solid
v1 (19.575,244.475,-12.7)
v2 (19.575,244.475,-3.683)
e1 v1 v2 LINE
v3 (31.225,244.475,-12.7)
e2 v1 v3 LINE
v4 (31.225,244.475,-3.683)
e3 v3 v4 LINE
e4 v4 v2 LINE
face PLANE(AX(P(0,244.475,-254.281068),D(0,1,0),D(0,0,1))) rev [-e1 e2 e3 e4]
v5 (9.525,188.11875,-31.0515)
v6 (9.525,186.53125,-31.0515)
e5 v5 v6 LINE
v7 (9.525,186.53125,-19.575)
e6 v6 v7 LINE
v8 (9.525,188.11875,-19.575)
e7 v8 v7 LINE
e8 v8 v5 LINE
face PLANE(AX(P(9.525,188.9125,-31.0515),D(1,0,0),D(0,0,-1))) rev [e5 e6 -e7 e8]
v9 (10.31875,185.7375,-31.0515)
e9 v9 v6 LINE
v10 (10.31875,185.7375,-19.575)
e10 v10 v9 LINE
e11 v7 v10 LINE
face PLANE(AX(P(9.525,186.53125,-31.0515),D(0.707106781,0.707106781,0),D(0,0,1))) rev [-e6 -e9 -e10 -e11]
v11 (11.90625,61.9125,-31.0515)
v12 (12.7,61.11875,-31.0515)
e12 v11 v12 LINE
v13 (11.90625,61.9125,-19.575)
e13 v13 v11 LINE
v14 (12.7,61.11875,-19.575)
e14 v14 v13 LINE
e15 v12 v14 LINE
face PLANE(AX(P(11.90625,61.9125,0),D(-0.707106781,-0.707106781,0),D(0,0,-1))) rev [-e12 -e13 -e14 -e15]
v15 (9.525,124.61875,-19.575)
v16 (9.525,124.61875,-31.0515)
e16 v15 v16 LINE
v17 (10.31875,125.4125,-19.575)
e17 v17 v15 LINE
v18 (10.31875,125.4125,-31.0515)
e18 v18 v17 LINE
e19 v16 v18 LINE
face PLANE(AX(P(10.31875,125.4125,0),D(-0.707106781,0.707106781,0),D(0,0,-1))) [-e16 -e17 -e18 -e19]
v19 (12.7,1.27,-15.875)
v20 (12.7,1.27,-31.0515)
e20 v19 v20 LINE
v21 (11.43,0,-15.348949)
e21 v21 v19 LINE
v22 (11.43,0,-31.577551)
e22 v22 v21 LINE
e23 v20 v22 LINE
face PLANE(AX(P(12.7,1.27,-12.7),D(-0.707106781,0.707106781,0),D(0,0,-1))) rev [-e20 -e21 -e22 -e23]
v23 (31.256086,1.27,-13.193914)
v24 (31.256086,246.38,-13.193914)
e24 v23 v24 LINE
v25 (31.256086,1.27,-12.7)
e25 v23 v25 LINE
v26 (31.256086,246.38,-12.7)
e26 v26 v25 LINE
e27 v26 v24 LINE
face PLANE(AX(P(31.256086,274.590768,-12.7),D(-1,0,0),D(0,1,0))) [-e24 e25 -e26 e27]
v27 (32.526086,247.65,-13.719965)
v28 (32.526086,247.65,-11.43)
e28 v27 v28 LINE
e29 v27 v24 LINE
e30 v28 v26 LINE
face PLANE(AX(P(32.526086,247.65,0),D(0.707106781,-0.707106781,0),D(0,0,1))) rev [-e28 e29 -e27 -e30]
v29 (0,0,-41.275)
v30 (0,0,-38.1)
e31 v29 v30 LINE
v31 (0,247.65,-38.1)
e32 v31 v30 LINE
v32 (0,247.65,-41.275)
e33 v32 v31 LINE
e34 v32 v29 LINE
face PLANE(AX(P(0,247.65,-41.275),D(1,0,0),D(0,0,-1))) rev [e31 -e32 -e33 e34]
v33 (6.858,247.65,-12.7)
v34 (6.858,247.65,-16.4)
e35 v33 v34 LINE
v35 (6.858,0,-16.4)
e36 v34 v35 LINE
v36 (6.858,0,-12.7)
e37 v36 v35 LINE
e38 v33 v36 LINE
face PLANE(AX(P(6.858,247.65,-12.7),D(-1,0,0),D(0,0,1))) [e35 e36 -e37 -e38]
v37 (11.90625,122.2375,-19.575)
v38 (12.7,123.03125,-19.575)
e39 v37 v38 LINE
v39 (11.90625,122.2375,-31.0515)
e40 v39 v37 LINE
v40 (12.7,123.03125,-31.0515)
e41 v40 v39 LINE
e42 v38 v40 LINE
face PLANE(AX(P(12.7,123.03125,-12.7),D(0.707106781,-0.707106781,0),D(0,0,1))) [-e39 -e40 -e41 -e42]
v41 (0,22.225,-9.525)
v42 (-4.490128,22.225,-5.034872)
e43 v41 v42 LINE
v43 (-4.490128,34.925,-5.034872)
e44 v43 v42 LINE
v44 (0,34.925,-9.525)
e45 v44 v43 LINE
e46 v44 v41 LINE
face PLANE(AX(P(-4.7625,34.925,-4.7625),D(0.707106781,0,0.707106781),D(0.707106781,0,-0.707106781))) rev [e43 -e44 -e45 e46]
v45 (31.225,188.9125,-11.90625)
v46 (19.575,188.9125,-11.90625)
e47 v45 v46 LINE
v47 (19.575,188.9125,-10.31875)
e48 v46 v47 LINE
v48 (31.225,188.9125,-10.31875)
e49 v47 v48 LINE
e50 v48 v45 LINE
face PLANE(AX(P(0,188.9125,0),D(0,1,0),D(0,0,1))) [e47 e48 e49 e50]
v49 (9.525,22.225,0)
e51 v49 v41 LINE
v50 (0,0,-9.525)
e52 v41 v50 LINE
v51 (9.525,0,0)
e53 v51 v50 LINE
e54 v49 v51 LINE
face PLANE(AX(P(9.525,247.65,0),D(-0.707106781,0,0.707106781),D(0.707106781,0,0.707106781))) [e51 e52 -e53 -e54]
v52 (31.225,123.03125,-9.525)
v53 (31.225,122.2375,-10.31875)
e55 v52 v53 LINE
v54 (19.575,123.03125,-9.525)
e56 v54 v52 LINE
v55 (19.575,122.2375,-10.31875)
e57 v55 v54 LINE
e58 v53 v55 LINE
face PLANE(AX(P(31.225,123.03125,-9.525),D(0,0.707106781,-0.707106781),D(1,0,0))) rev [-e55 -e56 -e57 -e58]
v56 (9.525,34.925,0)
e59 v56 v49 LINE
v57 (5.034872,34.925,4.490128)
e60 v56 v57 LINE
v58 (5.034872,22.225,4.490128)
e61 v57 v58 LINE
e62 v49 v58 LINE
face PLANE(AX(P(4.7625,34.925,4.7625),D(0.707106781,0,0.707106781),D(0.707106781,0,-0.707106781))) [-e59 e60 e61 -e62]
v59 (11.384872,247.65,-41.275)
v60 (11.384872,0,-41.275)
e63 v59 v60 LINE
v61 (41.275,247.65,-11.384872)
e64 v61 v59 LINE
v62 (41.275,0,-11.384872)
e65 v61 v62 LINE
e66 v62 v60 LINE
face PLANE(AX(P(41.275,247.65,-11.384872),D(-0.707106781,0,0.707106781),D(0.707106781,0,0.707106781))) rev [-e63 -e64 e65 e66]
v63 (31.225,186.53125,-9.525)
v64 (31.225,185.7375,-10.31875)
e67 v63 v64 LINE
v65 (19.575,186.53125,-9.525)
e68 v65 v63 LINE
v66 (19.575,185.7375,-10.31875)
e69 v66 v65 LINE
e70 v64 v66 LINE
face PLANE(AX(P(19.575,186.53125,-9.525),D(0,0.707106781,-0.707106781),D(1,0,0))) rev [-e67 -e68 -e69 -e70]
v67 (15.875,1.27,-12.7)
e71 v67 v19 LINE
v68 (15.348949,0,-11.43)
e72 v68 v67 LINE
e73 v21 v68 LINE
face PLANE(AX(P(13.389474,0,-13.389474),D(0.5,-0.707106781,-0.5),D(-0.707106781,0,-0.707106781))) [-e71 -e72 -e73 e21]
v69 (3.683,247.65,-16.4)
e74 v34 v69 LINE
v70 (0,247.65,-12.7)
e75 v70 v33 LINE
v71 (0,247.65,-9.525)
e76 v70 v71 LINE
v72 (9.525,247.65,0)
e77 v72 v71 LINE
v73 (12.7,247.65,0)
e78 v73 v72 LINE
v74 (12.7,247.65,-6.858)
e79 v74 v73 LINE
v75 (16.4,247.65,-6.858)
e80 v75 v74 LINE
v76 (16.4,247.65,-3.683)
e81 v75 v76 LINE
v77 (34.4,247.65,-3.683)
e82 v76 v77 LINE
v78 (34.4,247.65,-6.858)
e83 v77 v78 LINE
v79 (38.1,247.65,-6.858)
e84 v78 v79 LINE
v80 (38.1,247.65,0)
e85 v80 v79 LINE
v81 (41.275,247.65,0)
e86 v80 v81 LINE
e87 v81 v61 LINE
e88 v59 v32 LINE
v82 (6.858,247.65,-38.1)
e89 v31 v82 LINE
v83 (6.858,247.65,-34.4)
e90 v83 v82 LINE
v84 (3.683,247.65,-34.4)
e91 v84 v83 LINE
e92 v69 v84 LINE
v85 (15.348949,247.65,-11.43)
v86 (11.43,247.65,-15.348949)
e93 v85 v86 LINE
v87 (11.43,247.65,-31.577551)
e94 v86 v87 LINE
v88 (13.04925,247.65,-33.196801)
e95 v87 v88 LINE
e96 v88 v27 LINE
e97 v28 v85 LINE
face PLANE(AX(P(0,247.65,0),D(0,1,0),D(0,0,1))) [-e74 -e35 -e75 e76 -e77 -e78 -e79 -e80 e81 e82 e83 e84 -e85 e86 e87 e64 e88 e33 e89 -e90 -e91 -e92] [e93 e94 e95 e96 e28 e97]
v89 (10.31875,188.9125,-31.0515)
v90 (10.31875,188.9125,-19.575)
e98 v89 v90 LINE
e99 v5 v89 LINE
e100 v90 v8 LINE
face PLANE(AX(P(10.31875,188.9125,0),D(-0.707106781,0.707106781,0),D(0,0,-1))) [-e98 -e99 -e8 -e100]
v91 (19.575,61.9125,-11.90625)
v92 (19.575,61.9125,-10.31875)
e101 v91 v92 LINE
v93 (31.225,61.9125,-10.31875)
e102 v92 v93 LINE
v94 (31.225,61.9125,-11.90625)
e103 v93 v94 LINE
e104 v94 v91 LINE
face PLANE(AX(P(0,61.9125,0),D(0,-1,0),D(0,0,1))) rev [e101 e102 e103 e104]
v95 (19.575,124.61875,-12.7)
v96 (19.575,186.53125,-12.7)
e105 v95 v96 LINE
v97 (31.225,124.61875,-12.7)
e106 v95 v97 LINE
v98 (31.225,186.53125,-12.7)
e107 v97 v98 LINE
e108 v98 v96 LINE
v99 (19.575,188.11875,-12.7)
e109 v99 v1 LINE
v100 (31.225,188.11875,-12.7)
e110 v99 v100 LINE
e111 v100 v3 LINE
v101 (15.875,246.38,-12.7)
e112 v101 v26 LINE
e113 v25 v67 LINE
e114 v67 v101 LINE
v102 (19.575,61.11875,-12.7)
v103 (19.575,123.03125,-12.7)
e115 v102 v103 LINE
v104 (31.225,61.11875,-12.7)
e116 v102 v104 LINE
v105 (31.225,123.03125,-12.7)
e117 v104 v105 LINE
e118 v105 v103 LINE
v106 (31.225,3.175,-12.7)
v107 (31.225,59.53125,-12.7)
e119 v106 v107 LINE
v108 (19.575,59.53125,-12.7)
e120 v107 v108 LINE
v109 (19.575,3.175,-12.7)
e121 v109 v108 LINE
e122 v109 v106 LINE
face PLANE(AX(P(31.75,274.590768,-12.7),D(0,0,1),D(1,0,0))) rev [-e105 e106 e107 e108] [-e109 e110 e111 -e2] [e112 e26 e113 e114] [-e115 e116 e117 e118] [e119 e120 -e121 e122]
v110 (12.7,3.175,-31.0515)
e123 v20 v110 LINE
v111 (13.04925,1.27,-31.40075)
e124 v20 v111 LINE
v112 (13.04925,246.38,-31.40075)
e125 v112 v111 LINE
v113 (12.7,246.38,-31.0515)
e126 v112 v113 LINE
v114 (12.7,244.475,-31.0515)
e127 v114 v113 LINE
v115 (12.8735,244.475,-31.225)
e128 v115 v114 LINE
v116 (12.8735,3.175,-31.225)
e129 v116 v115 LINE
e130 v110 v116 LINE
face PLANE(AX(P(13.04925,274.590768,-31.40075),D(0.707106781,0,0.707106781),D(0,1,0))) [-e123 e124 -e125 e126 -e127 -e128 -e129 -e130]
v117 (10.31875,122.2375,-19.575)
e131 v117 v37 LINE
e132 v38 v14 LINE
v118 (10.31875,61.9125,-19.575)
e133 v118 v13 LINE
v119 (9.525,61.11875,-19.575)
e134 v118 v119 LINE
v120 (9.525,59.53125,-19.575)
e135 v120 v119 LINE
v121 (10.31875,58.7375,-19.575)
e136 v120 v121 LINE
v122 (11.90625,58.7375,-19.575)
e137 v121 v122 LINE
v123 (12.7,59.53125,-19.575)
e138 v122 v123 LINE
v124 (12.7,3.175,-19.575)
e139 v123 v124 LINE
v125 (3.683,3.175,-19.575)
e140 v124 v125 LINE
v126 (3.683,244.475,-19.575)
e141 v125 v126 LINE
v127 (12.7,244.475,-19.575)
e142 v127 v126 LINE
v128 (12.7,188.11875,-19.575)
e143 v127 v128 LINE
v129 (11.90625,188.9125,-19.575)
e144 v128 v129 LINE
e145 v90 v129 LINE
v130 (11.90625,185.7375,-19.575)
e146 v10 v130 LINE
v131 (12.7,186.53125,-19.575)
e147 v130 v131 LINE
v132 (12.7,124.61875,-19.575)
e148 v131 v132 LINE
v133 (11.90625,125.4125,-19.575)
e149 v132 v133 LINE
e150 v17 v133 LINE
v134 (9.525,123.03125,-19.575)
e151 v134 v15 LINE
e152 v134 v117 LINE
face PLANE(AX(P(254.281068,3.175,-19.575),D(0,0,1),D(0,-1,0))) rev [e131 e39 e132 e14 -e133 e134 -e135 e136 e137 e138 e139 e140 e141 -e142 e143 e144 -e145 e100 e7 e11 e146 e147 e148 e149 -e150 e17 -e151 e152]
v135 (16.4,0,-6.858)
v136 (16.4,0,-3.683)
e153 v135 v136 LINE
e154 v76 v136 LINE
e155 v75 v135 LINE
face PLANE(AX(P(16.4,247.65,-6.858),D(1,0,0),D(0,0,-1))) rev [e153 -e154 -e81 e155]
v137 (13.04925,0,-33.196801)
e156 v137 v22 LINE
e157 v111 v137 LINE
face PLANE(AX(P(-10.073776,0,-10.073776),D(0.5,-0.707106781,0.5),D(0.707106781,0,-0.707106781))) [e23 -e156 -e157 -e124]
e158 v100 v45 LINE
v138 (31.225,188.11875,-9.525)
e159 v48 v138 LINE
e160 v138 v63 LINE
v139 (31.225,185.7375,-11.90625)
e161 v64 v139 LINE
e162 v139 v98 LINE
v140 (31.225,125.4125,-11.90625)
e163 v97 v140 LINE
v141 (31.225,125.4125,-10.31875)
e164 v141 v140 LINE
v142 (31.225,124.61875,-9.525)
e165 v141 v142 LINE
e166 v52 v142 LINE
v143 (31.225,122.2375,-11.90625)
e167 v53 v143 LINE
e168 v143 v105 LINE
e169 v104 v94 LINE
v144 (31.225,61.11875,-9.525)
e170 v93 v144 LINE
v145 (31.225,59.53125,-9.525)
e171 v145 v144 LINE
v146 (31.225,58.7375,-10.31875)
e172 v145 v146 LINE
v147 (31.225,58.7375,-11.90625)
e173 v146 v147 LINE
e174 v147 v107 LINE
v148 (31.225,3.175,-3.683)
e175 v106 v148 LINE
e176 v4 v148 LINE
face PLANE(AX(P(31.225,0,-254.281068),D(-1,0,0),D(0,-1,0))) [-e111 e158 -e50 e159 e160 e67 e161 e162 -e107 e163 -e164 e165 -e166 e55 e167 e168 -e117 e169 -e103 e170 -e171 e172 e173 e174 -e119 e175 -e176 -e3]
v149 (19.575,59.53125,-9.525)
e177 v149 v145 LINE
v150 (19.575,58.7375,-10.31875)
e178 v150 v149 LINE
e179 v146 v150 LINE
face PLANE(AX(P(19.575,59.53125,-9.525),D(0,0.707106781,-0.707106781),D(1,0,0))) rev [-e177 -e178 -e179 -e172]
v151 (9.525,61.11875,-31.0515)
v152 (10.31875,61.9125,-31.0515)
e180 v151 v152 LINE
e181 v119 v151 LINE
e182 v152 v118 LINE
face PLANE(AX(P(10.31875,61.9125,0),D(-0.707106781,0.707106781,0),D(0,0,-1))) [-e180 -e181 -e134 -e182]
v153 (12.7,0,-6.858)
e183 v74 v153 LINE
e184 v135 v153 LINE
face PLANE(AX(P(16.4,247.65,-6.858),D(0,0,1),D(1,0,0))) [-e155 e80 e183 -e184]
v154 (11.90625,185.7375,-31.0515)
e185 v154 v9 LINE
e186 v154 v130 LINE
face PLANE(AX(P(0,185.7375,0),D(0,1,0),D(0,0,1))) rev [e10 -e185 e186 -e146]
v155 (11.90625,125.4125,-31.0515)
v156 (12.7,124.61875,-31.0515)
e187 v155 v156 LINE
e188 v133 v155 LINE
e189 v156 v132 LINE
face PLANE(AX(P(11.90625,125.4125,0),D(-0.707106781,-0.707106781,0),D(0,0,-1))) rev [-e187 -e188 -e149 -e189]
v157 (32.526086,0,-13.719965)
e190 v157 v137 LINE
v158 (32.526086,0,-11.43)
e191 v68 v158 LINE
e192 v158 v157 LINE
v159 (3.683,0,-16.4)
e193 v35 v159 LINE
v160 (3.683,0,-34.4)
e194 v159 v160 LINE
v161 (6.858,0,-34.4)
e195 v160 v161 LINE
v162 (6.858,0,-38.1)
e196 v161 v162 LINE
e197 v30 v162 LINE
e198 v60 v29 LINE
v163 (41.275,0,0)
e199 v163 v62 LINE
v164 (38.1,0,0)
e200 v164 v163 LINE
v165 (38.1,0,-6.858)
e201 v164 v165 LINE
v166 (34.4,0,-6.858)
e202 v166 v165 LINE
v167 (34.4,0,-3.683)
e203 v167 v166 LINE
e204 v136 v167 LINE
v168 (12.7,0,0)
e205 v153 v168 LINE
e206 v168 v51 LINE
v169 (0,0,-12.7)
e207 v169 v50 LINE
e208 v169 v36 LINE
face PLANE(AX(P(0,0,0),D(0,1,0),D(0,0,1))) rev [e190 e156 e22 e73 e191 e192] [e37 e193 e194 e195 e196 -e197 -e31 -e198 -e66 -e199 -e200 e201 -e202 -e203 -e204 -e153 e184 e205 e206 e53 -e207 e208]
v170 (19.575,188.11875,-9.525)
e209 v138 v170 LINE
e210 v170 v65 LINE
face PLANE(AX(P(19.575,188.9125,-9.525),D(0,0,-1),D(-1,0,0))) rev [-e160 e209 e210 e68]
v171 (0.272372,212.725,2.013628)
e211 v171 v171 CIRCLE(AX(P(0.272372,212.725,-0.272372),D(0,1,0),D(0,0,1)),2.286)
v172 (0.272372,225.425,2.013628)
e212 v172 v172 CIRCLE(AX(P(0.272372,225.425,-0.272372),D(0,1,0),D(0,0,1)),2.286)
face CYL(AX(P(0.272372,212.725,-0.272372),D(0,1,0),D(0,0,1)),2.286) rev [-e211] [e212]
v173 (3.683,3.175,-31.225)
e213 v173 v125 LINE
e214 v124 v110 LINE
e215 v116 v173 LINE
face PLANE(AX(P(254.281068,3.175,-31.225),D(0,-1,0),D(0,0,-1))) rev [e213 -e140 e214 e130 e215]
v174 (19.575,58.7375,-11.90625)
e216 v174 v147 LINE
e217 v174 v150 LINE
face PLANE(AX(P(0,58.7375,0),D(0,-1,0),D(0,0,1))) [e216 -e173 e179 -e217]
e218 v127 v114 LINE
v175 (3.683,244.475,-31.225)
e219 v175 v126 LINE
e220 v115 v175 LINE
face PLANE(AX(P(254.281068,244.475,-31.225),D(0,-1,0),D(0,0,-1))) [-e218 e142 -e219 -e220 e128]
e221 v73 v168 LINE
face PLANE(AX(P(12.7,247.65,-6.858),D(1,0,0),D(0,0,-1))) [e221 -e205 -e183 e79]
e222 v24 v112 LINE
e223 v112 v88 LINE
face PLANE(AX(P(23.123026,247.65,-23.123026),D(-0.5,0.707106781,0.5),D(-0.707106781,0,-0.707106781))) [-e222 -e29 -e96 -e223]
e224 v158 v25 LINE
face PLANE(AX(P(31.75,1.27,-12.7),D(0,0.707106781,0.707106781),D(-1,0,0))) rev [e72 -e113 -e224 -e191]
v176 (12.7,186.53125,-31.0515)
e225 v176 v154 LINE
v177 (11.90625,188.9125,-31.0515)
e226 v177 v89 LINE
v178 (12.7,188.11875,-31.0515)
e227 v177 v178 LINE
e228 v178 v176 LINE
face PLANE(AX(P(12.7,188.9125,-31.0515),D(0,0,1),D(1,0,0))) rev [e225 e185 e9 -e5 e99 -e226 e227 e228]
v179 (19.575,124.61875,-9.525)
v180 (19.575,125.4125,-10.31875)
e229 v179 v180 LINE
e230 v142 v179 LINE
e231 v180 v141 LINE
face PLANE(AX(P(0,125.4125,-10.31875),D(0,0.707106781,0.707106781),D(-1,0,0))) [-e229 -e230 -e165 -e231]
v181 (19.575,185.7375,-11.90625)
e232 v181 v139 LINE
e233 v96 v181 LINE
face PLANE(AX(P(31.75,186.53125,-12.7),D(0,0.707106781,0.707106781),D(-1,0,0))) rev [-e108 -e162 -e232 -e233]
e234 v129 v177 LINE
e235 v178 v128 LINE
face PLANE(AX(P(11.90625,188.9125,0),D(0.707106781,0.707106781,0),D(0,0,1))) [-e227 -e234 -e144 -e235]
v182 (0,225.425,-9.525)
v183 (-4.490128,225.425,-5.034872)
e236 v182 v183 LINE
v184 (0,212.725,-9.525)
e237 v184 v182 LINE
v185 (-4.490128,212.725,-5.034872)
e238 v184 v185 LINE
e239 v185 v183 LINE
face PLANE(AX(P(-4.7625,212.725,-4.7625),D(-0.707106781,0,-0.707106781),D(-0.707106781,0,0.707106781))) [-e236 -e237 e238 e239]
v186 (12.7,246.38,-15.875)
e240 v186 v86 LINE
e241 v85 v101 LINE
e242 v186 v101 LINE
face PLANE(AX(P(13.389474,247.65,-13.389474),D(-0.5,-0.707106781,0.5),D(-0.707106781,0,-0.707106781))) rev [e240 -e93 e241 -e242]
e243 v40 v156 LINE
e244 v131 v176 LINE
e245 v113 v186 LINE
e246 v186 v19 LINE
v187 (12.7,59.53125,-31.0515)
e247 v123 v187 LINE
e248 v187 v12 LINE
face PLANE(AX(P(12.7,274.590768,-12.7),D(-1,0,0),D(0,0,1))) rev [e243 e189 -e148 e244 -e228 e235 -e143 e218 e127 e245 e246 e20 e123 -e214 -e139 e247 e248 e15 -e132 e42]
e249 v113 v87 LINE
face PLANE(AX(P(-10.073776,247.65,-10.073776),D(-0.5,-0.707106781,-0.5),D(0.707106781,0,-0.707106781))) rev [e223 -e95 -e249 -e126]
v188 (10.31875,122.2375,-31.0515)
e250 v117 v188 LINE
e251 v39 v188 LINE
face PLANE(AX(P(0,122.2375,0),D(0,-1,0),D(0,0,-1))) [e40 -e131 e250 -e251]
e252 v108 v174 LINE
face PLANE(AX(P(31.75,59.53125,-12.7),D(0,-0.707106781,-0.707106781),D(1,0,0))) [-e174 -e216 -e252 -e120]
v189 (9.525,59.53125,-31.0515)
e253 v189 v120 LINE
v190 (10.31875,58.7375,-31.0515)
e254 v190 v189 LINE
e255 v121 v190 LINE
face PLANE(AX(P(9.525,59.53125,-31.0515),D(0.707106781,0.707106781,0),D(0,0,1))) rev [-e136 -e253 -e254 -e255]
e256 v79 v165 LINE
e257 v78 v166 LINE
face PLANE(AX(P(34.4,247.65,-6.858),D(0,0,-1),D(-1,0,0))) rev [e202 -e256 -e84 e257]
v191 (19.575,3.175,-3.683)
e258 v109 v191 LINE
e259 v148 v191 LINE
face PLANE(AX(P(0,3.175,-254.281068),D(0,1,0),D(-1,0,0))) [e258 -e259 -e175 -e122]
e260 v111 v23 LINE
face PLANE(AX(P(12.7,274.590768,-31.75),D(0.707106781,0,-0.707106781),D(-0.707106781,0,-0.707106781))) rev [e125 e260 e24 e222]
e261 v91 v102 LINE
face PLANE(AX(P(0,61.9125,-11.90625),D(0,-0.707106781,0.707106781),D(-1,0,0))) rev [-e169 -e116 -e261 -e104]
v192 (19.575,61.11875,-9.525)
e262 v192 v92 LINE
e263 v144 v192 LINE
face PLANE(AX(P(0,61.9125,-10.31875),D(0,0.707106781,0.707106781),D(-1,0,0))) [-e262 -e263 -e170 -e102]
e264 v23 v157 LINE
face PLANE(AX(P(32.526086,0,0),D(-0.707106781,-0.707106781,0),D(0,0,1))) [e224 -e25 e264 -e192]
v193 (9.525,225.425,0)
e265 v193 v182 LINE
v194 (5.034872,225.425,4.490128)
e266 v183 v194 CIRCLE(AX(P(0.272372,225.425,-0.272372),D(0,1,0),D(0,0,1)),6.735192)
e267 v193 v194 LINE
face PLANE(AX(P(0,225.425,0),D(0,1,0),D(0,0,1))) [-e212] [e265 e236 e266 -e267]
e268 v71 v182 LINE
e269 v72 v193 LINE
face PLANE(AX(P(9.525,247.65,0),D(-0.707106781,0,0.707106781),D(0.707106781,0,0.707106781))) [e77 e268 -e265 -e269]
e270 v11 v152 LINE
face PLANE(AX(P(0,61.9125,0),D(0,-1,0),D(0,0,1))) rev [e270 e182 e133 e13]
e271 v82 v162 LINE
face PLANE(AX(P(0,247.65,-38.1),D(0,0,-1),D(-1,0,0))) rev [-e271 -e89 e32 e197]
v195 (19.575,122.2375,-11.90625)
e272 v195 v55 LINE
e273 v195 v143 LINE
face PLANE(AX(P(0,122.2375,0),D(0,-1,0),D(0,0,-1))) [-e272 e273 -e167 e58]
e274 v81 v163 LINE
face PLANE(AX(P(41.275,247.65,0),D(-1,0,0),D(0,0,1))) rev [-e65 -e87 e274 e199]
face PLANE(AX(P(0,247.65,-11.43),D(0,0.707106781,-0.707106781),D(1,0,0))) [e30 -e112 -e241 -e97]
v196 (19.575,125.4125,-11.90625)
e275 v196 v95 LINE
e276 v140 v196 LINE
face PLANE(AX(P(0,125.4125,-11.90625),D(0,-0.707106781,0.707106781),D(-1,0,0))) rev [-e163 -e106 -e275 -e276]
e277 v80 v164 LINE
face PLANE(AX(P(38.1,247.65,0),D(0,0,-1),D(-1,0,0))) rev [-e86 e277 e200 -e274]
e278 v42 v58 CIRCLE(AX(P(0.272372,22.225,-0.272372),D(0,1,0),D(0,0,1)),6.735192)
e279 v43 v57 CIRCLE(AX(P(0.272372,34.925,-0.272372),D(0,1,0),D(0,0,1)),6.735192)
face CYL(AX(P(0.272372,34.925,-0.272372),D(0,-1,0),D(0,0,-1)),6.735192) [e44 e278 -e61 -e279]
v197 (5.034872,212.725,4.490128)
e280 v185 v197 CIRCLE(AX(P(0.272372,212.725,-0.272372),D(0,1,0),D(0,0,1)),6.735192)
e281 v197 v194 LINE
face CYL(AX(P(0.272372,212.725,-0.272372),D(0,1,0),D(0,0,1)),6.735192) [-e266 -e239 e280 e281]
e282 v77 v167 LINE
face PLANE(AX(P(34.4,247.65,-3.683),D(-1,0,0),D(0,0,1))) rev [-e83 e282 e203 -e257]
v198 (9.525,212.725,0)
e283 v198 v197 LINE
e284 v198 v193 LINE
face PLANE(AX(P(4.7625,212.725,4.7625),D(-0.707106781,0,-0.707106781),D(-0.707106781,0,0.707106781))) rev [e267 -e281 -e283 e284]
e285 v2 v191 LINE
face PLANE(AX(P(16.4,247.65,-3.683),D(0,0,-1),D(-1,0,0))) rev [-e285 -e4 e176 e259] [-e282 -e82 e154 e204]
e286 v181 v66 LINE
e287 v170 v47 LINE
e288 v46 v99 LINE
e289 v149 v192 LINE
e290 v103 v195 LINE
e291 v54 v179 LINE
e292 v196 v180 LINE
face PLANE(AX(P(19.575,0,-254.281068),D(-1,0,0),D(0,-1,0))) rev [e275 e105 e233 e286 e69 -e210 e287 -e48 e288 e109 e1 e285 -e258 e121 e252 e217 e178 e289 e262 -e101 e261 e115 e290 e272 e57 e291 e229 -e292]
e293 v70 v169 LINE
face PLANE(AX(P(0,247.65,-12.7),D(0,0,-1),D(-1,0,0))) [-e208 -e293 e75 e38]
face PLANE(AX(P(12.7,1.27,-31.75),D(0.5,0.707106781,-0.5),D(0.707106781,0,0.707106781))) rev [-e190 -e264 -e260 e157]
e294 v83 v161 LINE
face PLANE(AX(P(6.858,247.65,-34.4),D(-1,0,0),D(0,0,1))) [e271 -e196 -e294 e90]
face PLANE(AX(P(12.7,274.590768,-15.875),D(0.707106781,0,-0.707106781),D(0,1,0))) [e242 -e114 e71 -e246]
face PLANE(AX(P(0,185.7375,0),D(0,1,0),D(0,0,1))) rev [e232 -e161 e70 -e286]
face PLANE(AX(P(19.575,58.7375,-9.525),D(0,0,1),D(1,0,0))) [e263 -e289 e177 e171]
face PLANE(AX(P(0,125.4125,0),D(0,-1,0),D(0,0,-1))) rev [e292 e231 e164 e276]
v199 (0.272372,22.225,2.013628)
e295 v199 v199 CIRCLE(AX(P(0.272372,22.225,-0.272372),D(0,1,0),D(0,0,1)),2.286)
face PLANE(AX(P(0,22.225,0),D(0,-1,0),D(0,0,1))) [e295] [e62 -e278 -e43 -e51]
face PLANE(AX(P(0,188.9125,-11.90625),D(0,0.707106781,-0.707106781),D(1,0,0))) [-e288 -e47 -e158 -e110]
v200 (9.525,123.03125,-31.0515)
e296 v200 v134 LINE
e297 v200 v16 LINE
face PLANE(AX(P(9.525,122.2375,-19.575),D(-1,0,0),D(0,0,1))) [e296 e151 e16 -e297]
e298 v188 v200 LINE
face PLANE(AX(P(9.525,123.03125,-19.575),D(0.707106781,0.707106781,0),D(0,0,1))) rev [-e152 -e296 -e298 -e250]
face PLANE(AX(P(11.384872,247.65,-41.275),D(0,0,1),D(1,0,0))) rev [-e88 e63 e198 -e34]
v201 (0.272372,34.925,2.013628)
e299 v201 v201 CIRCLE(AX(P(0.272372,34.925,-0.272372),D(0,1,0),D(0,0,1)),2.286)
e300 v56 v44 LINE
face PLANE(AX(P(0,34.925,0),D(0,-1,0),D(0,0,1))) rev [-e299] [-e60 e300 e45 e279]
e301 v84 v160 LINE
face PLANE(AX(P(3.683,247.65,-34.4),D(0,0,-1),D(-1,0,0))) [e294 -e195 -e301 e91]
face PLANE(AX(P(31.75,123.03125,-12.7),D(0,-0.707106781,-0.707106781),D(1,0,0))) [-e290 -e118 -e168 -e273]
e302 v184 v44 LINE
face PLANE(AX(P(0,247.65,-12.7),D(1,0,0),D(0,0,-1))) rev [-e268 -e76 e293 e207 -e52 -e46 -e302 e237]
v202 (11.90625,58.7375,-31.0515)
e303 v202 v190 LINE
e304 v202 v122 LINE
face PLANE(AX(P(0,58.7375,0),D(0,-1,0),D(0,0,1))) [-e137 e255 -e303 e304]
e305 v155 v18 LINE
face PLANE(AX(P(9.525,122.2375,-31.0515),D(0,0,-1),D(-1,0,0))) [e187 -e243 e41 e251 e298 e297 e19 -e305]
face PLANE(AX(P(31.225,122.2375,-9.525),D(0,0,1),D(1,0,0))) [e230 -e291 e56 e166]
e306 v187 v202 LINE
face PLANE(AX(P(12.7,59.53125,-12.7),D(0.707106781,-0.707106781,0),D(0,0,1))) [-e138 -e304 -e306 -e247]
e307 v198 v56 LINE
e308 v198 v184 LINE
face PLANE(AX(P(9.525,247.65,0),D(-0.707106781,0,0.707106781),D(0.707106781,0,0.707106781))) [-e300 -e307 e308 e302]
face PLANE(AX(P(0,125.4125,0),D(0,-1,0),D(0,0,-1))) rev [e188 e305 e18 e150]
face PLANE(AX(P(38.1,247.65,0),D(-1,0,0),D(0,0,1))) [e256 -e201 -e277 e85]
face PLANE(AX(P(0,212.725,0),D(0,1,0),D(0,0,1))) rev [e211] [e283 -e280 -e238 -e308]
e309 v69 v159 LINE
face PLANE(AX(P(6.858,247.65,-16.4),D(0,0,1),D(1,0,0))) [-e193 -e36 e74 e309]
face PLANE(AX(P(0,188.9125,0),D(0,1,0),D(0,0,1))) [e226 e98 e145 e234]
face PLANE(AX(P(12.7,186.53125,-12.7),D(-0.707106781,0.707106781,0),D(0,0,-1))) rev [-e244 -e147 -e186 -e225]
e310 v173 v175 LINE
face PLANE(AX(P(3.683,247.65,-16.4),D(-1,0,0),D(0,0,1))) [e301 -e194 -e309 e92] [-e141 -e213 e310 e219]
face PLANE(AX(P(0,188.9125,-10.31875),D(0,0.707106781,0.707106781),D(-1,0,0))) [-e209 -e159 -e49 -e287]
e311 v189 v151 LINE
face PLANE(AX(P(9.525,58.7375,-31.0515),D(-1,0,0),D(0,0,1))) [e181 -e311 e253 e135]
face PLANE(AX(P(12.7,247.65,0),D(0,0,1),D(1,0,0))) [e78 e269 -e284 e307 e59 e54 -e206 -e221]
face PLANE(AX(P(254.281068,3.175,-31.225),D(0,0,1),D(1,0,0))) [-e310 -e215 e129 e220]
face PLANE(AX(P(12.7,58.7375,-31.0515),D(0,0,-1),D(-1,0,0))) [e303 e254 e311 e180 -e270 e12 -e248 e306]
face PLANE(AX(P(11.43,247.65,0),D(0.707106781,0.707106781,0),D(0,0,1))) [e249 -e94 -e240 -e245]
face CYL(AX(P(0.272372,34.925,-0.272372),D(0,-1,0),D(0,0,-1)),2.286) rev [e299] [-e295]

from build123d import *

# Parameters (mm, degrees)
BOSS_EXTRUDE4_DEPTH      = 247.65
CUT_EXTRUDE9_DEPTH       = 247.65
SKETCH11_W               = 11.65
SKETCH11_H               = 241.3
CUT_EXTRUDE7_DEPTH       = 9.017
SKETCH12_W               = 11.65
SKETCH12_H               = 241.3
CUT_EXTRUDE8_DEPTH       = 9.017
SKETCH16_R               = 2.286
BOSS_EXTRUDE5_DEPTH      = 12.7
CHAMFER1_SIZE            = 0.493914087
CHAMFER1_SIZE_2          = 0.6985
CHAMFER2_SIZE            = 3.175
CHAMFER3_SIZE            = 1.27
BOSS_EXTRUDE6_DEPTH      = 1.5875
BOSS_EXTRUDE6_DEPTH_BACK = 1.5875
SKETCH19_W               = 11.65
SKETCH19_H               = 3.175
SKETCH19_W_2             = 3.175
SKETCH19_H_2             = 11.4765
SKETCH20_W               = 3.175
SKETCH20_H               = 11.4765
SKETCH20_W_2             = 11.65
SKETCH20_H_2             = 3.175
BOSS_EXTRUDE7_DEPTH      = 3.175
CHAMFER4_SIZE            = 0.79375


with BuildPart() as part:
    # Sketch1 → Boss-Extrude4 (new body)
    with BuildSketch(Plane(origin=(0, 0, 0), x_dir=(1, 0, 0), z_dir=(0, 1, 0))):
        Polygon((41.275, 0), (41.275, 11.384871939), (11.384871939, 41.275), (0, 41.275), (0, 38.1), (6.858, 38.1), (6.858, 34.4), (3.683, 34.4), (3.683, 16.4), (6.858, 16.4), (6.858, 12.7), (0, 12.7), (0, 9.525), (9.525, 0), (12.7, 0), (12.7, 6.858), (16.4, 6.858), (16.4, 3.683), (34.4, 3.683), (34.4, 6.858), (38.1, 6.858), (38.1, 0), align=None)
    extrude(amount=BOSS_EXTRUDE4_DEPTH)

    # Sketch13 → Cut-Extrude9 (cut)
    with BuildSketch(Plane.XZ):
        Polygon((12.7, -12.7), (12.7, -31.75), (31.75, -12.7), align=None)
    extrude(amount=-CUT_EXTRUDE9_DEPTH, mode=Mode.SUBTRACT)

    # Sketch11 → Cut-Extrude7 (cut)
    with BuildSketch(Plane.ZY.offset(-3.683)):
        with Locations((-25.4, 123.825)):
            Rectangle(SKETCH11_W, SKETCH11_H)
    extrude(amount=-CUT_EXTRUDE7_DEPTH, mode=Mode.SUBTRACT)

    # Sketch12 → Cut-Extrude8 (cut)
    with BuildSketch(Plane.XY.offset(-3.683)):
        with Locations((25.4, 123.825)):
            Rectangle(SKETCH12_W, SKETCH12_H)
    extrude(amount=-CUT_EXTRUDE8_DEPTH, mode=Mode.SUBTRACT)

    # Sketch16 → Boss-Extrude5 (add)
    with BuildSketch(Plane(origin=(0, 225.425, 0), x_dir=(1, 0, 0), z_dir=(0, 1, 0))):
        with BuildLine():
            Line((5.034871939, -4.490128061), (9.525, 0))
            Line((9.525, 0), (0, 9.525))
            Line((0, 9.525), (-4.490128061, 5.034871939))
            ThreePointArc((-4.490128061, 5.034871939), (-4.490128061, -4.490128061), (5.034871939, -4.490128061))
        make_face()
        with Locations(Location((0.272371939, 0.272371939, 0), (0, 0, 270))):
            Circle(SKETCH16_R, mode=Mode.SUBTRACT)
    boss_extrude5 = extrude(amount=-BOSS_EXTRUDE5_DEPTH)

    # Mirror1: Boss-Extrude5 across plane
    add(boss_extrude5.mirror(Plane.ZX.offset(123.825)))

    # Chamfer1
    # the kernel refuses this chamfer: 0.6985, 0.493914087 mm, written as the material it adds along each edge
    with BuildSketch(Plane(origin=(31.75, 0, -12.7), x_dir=(-0.9984038297885895, 0, 0.056478249472492296), z_dir=(0, 1, 0))) as chamfer1_piece_1:
        Polygon((CHAMFER1_SIZE * 0.998403829099, -CHAMFER1_SIZE * 0.0564782494335), (CHAMFER1_SIZE_2 * 0.666041965215, -CHAMFER1_SIZE_2 * 0.745914271598), (0, 0), align=None)
    extrude(amount=247.65)
    with BuildSketch(Plane(origin=(12.7, 0, -31.75), x_dir=(0.745914271597676, 0, 0.6660419652145867), z_dir=(0, 1, 0))) as chamfer1_piece_2_section:
        Polygon((CHAMFER1_SIZE * 0.998403829099, -CHAMFER1_SIZE * 0.0564782494335), (CHAMFER1_SIZE_2 * 0.666041965215, -CHAMFER1_SIZE_2 * 0.745914271598), (0, 0), align=None)
    chamfer1_piece_2 = extrude(amount=247.65, mode=Mode.PRIVATE)
    chamfer1_piece_2 = split(chamfer1_piece_2, bisect_by=Plane(origin=(12.824663098, 1.5875, -31.225), z_dir=(0, 0, -1)), keep=Keep.TOP, mode=Mode.PRIVATE)
    add(chamfer1_piece_2)
    with BuildSketch(Plane(origin=(12.7, 0, -31.75), x_dir=(0.745914271597676, 0, 0.6660419652145867), z_dir=(0, 1, 0))) as chamfer1_piece_3_section:
        Polygon((CHAMFER1_SIZE * 0.998403829099, -CHAMFER1_SIZE * 0.0564782494335), (CHAMFER1_SIZE_2 * 0.666041965215, -CHAMFER1_SIZE_2 * 0.745914271598), (0, 0), align=None)
    chamfer1_piece_3 = extrude(amount=249.446320567, mode=Mode.PRIVATE)
    chamfer1_piece_3 = split(chamfer1_piece_3, bisect_by=Plane(origin=(12.757833333, 3.175, -31.167166667), z_dir=(0, -1, 0)), keep=Keep.TOP, mode=Mode.PRIVATE)
    add(chamfer1_piece_3)
    with BuildSketch(Plane(origin=(12.7, -1.796320567, -31.75), x_dir=(0.745914271597676, 0, 0.6660419652145867), z_dir=(0, 1, 0))) as chamfer1_piece_4_section:
        Polygon((CHAMFER1_SIZE * 0.998403829099, -CHAMFER1_SIZE * 0.0564782494335), (CHAMFER1_SIZE_2 * 0.666041965215, -CHAMFER1_SIZE_2 * 0.745914271598), (0, 0), align=None)
    chamfer1_piece_4 = extrude(amount=249.446320567, mode=Mode.PRIVATE)
    chamfer1_piece_4 = split(chamfer1_piece_4, bisect_by=Plane(origin=(12.757833333, 244.475, -31.167166667), z_dir=(0, 1, 0)), keep=Keep.TOP, mode=Mode.PRIVATE)
    add(chamfer1_piece_4)

    # Chamfer2
    chamfer2_edges = [part.edges().sort_by_distance(p)[0] for p in [
        (12.7, 123.825, -12.7),
    ]]
    chamfer(chamfer2_edges, length=CHAMFER2_SIZE)

    # Chamfer3
    chamfer3_edges = [part.edges().sort_by_distance(p)[0] for p in [
        (22.152667957, 0, -22.297332043),
        (22.152667957, 247.65, -22.297332043),
        (23.565542957, 0, -12.7),
        (23.565542957, 247.65, -12.7),
        (12.874625, 0, -31.226125),
        (12.874625, 247.65, -31.226125),
        (31.256085913, 0, -12.946957043),
        (31.256085913, 247.65, -12.946957043),
        (12.7, 0, -23.46325),
        (12.7, 247.65, -23.46325),
        (14.2875, 0, -14.2875),
        (14.2875, 247.65, -14.2875),
    ]]
    chamfer(chamfer3_edges, length=CHAMFER3_SIZE)

    # Sketch19 → Boss-Extrude6 (add, two sides: drawn at the far end of the back side and taken through both)
    with BuildSketch(Plane(origin=(0, 123.825, 0), x_dir=(1, 0, 0), z_dir=(0, 1, 0)).offset(-BOSS_EXTRUDE6_DEPTH_BACK)):
        with Locations((25.4, 11.1125)):
            Rectangle(SKETCH19_W, SKETCH19_H)
        with Locations((11.1125, 25.31325)):
            Rectangle(SKETCH19_W_2, SKETCH19_H_2)
    extrude(amount=BOSS_EXTRUDE6_DEPTH + BOSS_EXTRUDE6_DEPTH_BACK)

    # Sketch20 → Boss-Extrude7 (add)
    with BuildSketch(Plane(origin=(0, 185.7375, 0), x_dir=(1, 0, 0), z_dir=(0, 1, 0))):
        with Locations((11.1125, 25.31325)):
            Rectangle(SKETCH20_W, SKETCH20_H)
        with Locations((25.4, 11.1125)):
            Rectangle(SKETCH20_W_2, SKETCH20_H_2)
    boss_extrude7 = extrude(amount=BOSS_EXTRUDE7_DEPTH)

    # Mirror2: Boss-Extrude7 across plane
    add(boss_extrude7.mirror(Plane.ZX.offset(123.825)))

    # Chamfer4
    chamfer4_edges = [part.edges().sort_by_distance(p)[0] for p in [
        (25.4, 122.2375, -12.7),
        (25.4, 122.2375, -9.525),
        (25.4, 125.4125, -9.525),
        (25.4, 125.4125, -12.7),
        (9.525, 122.2375, -25.31325),
        (12.7, 122.2375, -25.31325),
        (12.7, 125.4125, -25.31325),
        (9.525, 125.4125, -25.31325),
        (9.525, 185.7375, -25.31325),
        (12.7, 185.7375, -25.31325),
        (9.525, 188.9125, -25.31325),
        (12.7, 188.9125, -25.31325),
        (25.4, 185.7375, -12.7),
        (25.4, 185.7375, -9.525),
        (25.4, 188.9125, -12.7),
        (25.4, 188.9125, -9.525),
        (9.525, 58.7375, -25.31325),
        (12.7, 58.7375, -25.31325),
        (9.525, 61.9125, -25.31325),
        (12.7, 61.9125, -25.31325),
        (25.4, 58.7375, -12.7),
        (25.4, 58.7375, -9.525),
        (25.4, 61.9125, -12.7),
        (25.4, 61.9125, -9.525),
    ]]
    chamfer(chamfer4_edges, length=CHAMFER4_SIZE)


solid = part.part
